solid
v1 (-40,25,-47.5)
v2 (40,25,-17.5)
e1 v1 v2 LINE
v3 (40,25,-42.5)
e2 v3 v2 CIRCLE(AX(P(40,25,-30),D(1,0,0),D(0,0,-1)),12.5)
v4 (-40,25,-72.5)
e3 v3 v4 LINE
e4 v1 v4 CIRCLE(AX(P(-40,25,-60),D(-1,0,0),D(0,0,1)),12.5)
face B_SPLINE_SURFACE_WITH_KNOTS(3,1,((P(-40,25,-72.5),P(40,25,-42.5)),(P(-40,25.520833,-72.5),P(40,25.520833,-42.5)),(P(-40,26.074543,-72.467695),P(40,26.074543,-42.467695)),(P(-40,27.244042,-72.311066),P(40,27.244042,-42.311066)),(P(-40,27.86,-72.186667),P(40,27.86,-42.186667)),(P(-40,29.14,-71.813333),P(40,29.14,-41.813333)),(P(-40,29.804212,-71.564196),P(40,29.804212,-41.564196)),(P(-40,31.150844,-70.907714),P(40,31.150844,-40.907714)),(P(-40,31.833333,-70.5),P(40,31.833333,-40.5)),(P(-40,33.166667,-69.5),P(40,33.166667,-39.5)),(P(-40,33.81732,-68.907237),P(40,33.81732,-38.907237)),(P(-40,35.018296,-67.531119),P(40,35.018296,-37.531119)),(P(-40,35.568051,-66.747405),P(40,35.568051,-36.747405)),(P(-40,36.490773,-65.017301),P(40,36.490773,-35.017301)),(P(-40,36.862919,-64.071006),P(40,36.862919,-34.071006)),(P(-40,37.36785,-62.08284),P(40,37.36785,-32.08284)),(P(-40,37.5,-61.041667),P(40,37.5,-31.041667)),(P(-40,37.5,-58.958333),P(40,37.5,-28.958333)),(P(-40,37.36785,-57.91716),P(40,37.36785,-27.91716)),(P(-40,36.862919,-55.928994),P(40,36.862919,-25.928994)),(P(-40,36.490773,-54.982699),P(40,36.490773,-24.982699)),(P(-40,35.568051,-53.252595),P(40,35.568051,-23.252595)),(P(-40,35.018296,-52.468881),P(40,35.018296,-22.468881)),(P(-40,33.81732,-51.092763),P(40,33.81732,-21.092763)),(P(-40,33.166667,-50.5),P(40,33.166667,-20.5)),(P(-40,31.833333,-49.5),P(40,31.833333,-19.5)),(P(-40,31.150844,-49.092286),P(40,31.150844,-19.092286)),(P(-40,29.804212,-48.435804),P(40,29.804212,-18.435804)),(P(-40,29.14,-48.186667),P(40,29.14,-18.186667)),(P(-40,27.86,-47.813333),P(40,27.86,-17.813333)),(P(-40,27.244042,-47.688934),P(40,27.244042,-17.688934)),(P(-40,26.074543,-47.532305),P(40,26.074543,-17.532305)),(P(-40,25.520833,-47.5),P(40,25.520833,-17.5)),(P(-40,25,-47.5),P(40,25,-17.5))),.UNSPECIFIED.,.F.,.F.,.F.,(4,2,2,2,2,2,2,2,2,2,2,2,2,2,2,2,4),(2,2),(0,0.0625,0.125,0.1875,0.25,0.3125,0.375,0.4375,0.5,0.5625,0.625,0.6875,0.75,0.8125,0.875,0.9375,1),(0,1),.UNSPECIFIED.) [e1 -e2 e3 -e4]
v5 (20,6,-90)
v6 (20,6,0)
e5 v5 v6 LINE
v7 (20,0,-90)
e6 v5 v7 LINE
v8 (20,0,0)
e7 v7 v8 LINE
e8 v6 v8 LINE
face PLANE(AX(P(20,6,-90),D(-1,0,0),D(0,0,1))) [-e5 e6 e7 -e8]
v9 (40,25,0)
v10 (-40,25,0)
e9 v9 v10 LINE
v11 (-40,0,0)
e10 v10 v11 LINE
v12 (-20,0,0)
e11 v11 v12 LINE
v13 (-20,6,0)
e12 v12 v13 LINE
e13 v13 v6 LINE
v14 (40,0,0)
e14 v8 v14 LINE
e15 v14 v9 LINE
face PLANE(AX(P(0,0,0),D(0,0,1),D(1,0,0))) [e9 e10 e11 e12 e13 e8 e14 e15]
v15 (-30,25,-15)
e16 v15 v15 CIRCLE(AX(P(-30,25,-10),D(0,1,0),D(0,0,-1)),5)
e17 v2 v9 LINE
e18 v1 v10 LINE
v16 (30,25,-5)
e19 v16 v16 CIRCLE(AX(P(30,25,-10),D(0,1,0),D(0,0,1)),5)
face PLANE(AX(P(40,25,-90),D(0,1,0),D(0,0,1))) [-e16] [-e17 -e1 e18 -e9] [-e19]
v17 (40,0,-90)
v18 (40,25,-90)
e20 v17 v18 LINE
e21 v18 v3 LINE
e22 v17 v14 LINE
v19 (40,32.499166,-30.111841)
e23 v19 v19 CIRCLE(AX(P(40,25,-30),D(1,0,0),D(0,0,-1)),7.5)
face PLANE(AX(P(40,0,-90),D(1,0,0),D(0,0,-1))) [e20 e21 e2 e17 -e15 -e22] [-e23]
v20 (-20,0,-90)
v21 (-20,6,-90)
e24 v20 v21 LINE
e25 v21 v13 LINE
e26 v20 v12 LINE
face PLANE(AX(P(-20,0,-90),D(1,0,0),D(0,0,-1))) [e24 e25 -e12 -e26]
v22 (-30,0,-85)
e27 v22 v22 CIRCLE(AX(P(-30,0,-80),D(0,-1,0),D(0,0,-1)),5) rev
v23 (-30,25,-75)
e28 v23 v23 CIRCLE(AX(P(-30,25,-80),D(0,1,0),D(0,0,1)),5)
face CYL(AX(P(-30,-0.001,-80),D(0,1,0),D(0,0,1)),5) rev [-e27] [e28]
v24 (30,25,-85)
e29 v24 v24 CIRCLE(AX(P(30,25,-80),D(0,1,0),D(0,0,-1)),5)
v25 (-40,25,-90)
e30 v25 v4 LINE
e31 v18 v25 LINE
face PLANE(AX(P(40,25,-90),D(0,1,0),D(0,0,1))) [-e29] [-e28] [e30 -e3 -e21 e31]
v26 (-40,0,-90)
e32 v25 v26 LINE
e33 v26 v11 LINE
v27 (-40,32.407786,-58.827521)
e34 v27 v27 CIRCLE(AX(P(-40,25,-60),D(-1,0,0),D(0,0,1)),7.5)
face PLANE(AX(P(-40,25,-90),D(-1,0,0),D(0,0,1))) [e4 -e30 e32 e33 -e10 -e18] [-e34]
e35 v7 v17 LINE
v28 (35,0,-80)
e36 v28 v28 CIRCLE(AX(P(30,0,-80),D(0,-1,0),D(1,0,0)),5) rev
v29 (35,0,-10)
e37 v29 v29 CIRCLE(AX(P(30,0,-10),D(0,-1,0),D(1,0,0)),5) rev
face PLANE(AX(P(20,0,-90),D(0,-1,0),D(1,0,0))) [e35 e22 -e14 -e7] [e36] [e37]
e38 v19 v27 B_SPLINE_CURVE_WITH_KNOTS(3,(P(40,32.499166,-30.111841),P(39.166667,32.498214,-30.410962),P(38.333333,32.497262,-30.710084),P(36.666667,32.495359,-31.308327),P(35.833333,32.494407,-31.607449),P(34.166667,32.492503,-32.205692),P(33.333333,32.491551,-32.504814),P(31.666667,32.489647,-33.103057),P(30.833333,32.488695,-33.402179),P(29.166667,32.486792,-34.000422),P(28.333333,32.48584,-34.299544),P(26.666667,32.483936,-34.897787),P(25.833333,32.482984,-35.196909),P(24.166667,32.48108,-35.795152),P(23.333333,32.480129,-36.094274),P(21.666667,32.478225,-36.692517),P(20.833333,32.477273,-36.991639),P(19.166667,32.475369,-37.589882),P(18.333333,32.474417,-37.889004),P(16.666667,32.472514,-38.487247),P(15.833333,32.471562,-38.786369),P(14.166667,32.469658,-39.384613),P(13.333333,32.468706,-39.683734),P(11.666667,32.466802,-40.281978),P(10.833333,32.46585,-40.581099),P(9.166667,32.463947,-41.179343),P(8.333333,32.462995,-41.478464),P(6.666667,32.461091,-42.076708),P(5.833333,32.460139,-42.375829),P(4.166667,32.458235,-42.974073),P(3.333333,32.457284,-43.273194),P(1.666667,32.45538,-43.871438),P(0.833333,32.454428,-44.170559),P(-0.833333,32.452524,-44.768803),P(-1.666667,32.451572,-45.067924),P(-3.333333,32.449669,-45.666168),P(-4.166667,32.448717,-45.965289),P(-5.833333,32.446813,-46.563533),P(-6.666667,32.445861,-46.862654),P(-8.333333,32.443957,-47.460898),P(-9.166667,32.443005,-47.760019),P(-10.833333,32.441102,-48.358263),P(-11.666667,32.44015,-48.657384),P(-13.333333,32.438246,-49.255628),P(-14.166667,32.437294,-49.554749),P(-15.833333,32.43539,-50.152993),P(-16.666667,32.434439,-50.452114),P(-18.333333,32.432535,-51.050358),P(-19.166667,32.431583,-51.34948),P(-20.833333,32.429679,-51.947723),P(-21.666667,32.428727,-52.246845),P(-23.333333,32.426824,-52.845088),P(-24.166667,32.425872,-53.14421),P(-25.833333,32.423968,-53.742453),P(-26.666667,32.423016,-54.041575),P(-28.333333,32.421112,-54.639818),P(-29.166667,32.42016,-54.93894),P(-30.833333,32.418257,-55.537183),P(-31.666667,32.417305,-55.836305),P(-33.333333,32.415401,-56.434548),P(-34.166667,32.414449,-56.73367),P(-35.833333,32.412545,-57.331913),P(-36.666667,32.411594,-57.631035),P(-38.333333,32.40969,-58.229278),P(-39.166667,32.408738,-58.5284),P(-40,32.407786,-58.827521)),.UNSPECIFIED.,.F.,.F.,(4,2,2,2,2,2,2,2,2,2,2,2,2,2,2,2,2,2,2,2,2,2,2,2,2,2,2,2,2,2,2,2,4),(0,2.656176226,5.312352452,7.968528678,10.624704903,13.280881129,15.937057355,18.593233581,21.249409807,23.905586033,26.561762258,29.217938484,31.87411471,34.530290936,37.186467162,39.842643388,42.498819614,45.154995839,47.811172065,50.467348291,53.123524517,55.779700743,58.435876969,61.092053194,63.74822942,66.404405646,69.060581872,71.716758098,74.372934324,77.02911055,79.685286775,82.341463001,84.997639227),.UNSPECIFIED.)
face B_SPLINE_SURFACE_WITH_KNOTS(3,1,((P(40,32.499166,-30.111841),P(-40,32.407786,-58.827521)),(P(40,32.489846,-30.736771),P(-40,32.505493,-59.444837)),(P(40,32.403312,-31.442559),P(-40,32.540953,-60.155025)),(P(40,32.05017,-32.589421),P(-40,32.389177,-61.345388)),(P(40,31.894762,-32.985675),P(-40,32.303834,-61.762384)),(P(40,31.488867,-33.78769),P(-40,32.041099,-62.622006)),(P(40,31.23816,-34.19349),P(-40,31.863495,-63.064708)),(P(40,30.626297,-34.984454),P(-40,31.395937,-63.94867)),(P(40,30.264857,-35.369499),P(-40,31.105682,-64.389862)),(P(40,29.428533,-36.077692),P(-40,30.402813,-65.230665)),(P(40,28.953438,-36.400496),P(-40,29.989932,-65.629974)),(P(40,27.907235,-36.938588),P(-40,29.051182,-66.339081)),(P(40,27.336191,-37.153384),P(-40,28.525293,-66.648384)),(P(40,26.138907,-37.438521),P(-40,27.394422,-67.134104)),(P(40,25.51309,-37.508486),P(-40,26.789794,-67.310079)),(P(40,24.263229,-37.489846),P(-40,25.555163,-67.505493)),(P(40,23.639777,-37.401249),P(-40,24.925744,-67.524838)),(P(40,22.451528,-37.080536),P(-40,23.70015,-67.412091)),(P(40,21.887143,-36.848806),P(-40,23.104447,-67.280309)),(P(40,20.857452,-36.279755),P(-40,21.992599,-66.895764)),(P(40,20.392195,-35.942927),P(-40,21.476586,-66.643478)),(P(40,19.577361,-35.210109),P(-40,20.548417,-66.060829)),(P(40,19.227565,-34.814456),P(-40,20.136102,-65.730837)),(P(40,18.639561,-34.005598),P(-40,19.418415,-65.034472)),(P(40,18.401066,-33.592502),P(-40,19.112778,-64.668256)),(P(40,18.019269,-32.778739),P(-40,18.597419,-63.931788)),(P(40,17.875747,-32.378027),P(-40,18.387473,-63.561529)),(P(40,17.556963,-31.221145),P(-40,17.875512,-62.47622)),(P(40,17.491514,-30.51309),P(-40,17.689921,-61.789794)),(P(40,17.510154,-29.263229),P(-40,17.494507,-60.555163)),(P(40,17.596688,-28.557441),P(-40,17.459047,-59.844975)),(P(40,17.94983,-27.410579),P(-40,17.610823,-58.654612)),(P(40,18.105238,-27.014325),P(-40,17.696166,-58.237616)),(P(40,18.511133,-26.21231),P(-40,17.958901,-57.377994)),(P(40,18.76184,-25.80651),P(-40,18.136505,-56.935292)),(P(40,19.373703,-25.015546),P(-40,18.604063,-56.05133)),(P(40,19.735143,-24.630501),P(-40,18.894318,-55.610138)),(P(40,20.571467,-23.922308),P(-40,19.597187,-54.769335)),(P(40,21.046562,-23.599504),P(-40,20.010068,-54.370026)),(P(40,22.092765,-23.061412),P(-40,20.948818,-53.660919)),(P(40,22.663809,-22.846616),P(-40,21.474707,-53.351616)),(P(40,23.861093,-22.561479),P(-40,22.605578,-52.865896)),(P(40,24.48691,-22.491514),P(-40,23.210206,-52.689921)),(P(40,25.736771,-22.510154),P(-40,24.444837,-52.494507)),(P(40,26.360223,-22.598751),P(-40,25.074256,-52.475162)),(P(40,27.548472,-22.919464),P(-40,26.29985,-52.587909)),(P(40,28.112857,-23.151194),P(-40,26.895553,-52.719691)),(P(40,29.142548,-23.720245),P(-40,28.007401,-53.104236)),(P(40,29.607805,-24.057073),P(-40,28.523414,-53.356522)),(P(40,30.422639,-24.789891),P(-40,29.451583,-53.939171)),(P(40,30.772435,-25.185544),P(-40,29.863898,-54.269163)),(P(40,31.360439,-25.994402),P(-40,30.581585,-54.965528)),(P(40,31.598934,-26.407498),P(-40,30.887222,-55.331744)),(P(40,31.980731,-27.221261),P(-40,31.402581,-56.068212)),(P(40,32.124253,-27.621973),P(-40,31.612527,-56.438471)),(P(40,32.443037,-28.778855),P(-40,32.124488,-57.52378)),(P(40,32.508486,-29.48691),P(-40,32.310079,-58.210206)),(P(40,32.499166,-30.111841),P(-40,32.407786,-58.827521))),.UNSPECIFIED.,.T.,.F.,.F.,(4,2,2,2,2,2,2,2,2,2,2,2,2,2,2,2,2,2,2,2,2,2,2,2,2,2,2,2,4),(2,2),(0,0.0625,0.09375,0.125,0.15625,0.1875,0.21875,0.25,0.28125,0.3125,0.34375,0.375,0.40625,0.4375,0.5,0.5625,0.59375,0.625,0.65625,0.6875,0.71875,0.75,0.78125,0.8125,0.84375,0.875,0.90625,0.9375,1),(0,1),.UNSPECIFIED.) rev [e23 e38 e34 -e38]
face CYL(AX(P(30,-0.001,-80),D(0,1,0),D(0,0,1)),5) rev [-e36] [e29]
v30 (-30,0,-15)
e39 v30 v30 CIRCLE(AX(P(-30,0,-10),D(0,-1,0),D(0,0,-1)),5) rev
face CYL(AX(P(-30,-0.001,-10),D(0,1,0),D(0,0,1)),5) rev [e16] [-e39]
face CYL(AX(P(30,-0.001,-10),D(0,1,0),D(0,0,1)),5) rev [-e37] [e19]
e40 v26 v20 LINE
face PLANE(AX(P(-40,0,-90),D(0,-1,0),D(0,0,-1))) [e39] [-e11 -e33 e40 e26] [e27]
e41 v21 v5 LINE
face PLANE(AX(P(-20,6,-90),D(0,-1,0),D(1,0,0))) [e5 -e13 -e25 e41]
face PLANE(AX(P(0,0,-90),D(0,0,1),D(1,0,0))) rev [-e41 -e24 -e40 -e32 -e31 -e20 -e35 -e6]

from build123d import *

# Parameters (mm, degrees)
SALIENTE_EXTRUIR1_DEPTH = 90
CORTAR_EXTRUIR1_REACH   = 103.612
CROQUIS13_R             = 5


with BuildPart() as part:
    # Croquis1 → Saliente-Extruir1 (new body)
    with BuildSketch(Plane.XY):
        Polygon((-20, 0), (-20, 6), (20, 6), (20, 0), (40, 0), (40, 25), (-40, 25), (-40, 0), align=None)
    extrude(amount=-SALIENTE_EXTRUIR1_DEPTH)

    # Croquis7 → Recubrir5 section 0
    with BuildSketch(Plane.ZY.offset(40)):
        with BuildLine():
            Line((-72.5, 25), (-47.5, 25))
            ThreePointArc((-47.5, 25), (-60, 37.5), (-72.5, 25))
        make_face()
    # Croquis4 → Recubrir5 section 1
    with BuildSketch(Plane(origin=(40, 0, 0), x_dir=(0, 0, -1), z_dir=(1, 0, 0))):
        with BuildLine():
            Line((17.5, 25), (42.5, 25))
            ThreePointArc((42.5, 25), (30, 37.5), (17.5, 25))
        make_face()
    loft()

    # Cortar-Recubrir9: read off the stored shape, not the designer's step
    # Cortar-Recubrir9: loft between two sections, ruled curve by curve
    cortar_recubrir9_from = [
        Edge.make_bspline([(40, 32.499166066, -30.111840594), (40, 32.489846016, -30.7367711), (40, 32.403311627, -31.442559169), (40, 32.050170272, -32.589420619), (40, 31.894761884, -32.985674675), (40, 31.488867377, -33.787689912), (40, 31.23815997, -34.193490215), (40, 30.626297022, -34.984454015), (40, 30.264857287, -35.369499204), (40, 29.428532809, -36.077692088), (40, 28.953437789, -36.400496106), (40, 27.907235106, -36.938588098), (40, 27.33619148, -37.153384345), (40, 26.13890697, -37.438520628), (40, 25.513089911, -37.508486115), (40, 24.2632289, -37.489846016), (40, 23.639776598, -37.401249254), (40, 22.451527572, -37.08053575), (40, 21.887143317, -36.84880603), (40, 20.857452279, -36.279754704), (40, 20.392194841, -35.942926515), (40, 19.577361218, -35.210108693), (40, 19.227564602, -34.814456311), (40, 18.63956098, -34.005598017), (40, 18.40106638, -33.592501883), (40, 18.019269161, -32.778739219), (40, 17.875746519, -32.378026983), (40, 17.556962594, -31.221144617), (40, 17.491513885, -30.513089911), (40, 17.510153984, -29.2632289), (40, 17.596688373, -28.557440831), (40, 17.949829728, -27.410579381), (40, 18.105238116, -27.014325325), (40, 18.511132623, -26.212310088), (40, 18.76184003, -25.806509785), (40, 19.373702978, -25.015545985), (40, 19.735142713, -24.630500796), (40, 20.571467191, -23.922307912), (40, 21.046562211, -23.599503894), (40, 22.092764894, -23.061411902), (40, 22.66380852, -22.846615655), (40, 23.86109303, -22.561479372), (40, 24.486910089, -22.491513885), (40, 25.7367711, -22.510153984), (40, 26.360223402, -22.598750746), (40, 27.548472428, -22.91946425), (40, 28.112856683, -23.15119397), (40, 29.142547721, -23.720245296), (40, 29.607805159, -24.057073485), (40, 30.422638782, -24.789891307), (40, 30.772435398, -25.185543689), (40, 31.36043902, -25.994401983), (40, 31.59893362, -26.407498117), (40, 31.980730839, -27.221260781), (40, 32.124253481, -27.621973017), (40, 32.443037406, -28.778855383), (40, 32.508486115, -29.486910089), (40, 32.499166066, -30.111840594)], [0, 0, 0, 0, 0.0625, 0.0625, 0.09375, 0.09375, 0.125, 0.125, 0.15625, 0.15625, 0.1875, 0.1875, 0.21875, 0.21875, 0.25, 0.25, 0.28125, 0.28125, 0.3125, 0.3125, 0.34375, 0.34375, 0.375, 0.375, 0.40625, 0.40625, 0.4375, 0.4375, 0.5, 0.5, 0.5625, 0.5625, 0.59375, 0.59375, 0.625, 0.625, 0.65625, 0.65625, 0.6875, 0.6875, 0.71875, 0.71875, 0.75, 0.75, 0.78125, 0.78125, 0.8125, 0.8125, 0.84375, 0.84375, 0.875, 0.875, 0.90625, 0.90625, 0.9375, 0.9375, 1, 1, 1, 1], 3),
    ]
    cortar_recubrir9_to = [
        Edge.make_bspline([(-40, 32.407786034, -58.827521395), (-40, 32.505492584, -59.444836898), (-40, 32.540952669, -60.155025311), (-40, 32.389176568, -61.345388288), (-40, 32.303834333, -61.762384388), (-40, 32.041099336, -62.622005881), (-40, 31.863495239, -63.064707671), (-40, 31.395936741, -63.948669802), (-40, 31.105682099, -64.38986219), (-40, 30.4028125, -65.230665449), (-40, 29.989931581, -65.629973674), (-40, 29.051182223, -66.33908064), (-40, 28.525292772, -66.648383946), (-40, 27.394421955, -67.134104129), (-40, 26.789794107, -67.310079483), (-40, 25.555163102, -67.505492584), (-40, 24.925744385, -67.524837827), (-40, 23.700150248, -67.41209072), (-40, 23.104447414, -67.280309139), (-40, 21.992598562, -66.895763725), (-40, 21.476585556, -66.643477599), (-40, 20.548417009, -66.060829384), (-40, 20.136101969, -65.730837282), (-40, 19.418414702, -65.034471726), (-40, 19.112777895, -64.668255626), (-40, 18.597419473, -63.931788052), (-40, 18.38747326, -63.561529181), (-40, 17.875511732, -62.476220288), (-40, 17.689920517, -61.789794107), (-40, 17.494507416, -60.555163102), (-40, 17.459047331, -59.844974689), (-40, 17.610823432, -58.654611712), (-40, 17.696165667, -58.237615612), (-40, 17.958900664, -57.377994119), (-40, 18.136504761, -56.935292329), (-40, 18.604063259, -56.051330198), (-40, 18.894317901, -55.61013781), (-40, 19.5971875, -54.769334551), (-40, 20.010068419, -54.370026326), (-40, 20.948817777, -53.66091936), (-40, 21.474707228, -53.351616054), (-40, 22.605578045, -52.865895871), (-40, 23.210205893, -52.689920517), (-40, 24.444836898, -52.494507416), (-40, 25.074255615, -52.475162173), (-40, 26.299849752, -52.58790928), (-40, 26.895552586, -52.719690861), (-40, 28.007401438, -53.104236275), (-40, 28.523414444, -53.356522401), (-40, 29.451582991, -53.939170616), (-40, 29.863898031, -54.269162718), (-40, 30.581585298, -54.965528274), (-40, 30.887222105, -55.331744374), (-40, 31.402580527, -56.068211948), (-40, 31.61252674, -56.438470819), (-40, 32.124488268, -57.523779712), (-40, 32.310079483, -58.210205893), (-40, 32.407786034, -58.827521395)], [0, 0, 0, 0, 0.0625, 0.0625, 0.09375, 0.09375, 0.125, 0.125, 0.15625, 0.15625, 0.1875, 0.1875, 0.21875, 0.21875, 0.25, 0.25, 0.28125, 0.28125, 0.3125, 0.3125, 0.34375, 0.34375, 0.375, 0.375, 0.40625, 0.40625, 0.4375, 0.4375, 0.5, 0.5, 0.5625, 0.5625, 0.59375, 0.59375, 0.625, 0.625, 0.65625, 0.65625, 0.6875, 0.6875, 0.71875, 0.71875, 0.75, 0.75, 0.78125, 0.78125, 0.8125, 0.8125, 0.84375, 0.84375, 0.875, 0.875, 0.90625, 0.90625, 0.9375, 0.9375, 1, 1, 1, 1], 3),
    ]
    cortar_recubrir9 = Solid(Shell([*[Face.make_surface_from_curves(cortar_recubrir9_from[k], cortar_recubrir9_to[k]) for k in range(1)], Face(Wire(cortar_recubrir9_from)), Face(Wire(cortar_recubrir9_to))]))
    add(cortar_recubrir9, mode=Mode.SUBTRACT)

    # Croquis13 → Cortar-Extruir1 (cut, up to next)
    with BuildSketch(Plane(origin=(0, 25, 0), x_dir=(1, 0, 0), z_dir=(0, 1, 0)), mode=Mode.PRIVATE) as cortar_extruir1_sk1:
        with Locations(Location((-30, 80, 0), (0, 0, 270))):
            Circle(CROQUIS13_R)
    cortar_extruir1_tool1 = extrude(cortar_extruir1_sk1.sketch, amount=-CORTAR_EXTRUIR1_REACH, mode=Mode.PRIVATE) & part.part
    # Croquis13 → Cortar-Extruir1 (cut, up to next)
    with BuildSketch(Plane(origin=(0, 25, 0), x_dir=(1, 0, 0), z_dir=(0, 1, 0)), mode=Mode.PRIVATE) as cortar_extruir1_sk2:
        with Locations((30, 80)):
            Circle(CROQUIS13_R)
    cortar_extruir1_tool2 = extrude(cortar_extruir1_sk2.sketch, amount=-CORTAR_EXTRUIR1_REACH, mode=Mode.PRIVATE) & part.part
    # Croquis13 → Cortar-Extruir1 (cut, up to next)
    with BuildSketch(Plane(origin=(0, 25, 0), x_dir=(1, 0, 0), z_dir=(0, 1, 0)), mode=Mode.PRIVATE) as cortar_extruir1_sk3:
        with Locations(Location((30, 10, 0), (0, 0, 270))):
            Circle(CROQUIS13_R)
    cortar_extruir1_tool3 = extrude(cortar_extruir1_sk3.sketch, amount=-CORTAR_EXTRUIR1_REACH, mode=Mode.PRIVATE) & part.part
    # Croquis13 → Cortar-Extruir1 (cut, up to next)
    with BuildSketch(Plane(origin=(0, 25, 0), x_dir=(1, 0, 0), z_dir=(0, 1, 0)), mode=Mode.PRIVATE) as cortar_extruir1_sk4:
        with Locations(Location((-30, 10, 0), (0, 0, 90))):
            Circle(CROQUIS13_R)
    cortar_extruir1_tool4 = extrude(cortar_extruir1_sk4.sketch, amount=-CORTAR_EXTRUIR1_REACH, mode=Mode.PRIVATE) & part.part
    add(cortar_extruir1_tool1.solids().sort_by_distance((-30, 25, -80))[0], mode=Mode.SUBTRACT)
    add(cortar_extruir1_tool2.solids().sort_by_distance((30, 25, -80))[0], mode=Mode.SUBTRACT)
    add(cortar_extruir1_tool3.solids().sort_by_distance((30, 25, -10))[0], mode=Mode.SUBTRACT)
    add(cortar_extruir1_tool4.solids().sort_by_distance((-30, 25, -10))[0], mode=Mode.SUBTRACT)


solid = part.part
